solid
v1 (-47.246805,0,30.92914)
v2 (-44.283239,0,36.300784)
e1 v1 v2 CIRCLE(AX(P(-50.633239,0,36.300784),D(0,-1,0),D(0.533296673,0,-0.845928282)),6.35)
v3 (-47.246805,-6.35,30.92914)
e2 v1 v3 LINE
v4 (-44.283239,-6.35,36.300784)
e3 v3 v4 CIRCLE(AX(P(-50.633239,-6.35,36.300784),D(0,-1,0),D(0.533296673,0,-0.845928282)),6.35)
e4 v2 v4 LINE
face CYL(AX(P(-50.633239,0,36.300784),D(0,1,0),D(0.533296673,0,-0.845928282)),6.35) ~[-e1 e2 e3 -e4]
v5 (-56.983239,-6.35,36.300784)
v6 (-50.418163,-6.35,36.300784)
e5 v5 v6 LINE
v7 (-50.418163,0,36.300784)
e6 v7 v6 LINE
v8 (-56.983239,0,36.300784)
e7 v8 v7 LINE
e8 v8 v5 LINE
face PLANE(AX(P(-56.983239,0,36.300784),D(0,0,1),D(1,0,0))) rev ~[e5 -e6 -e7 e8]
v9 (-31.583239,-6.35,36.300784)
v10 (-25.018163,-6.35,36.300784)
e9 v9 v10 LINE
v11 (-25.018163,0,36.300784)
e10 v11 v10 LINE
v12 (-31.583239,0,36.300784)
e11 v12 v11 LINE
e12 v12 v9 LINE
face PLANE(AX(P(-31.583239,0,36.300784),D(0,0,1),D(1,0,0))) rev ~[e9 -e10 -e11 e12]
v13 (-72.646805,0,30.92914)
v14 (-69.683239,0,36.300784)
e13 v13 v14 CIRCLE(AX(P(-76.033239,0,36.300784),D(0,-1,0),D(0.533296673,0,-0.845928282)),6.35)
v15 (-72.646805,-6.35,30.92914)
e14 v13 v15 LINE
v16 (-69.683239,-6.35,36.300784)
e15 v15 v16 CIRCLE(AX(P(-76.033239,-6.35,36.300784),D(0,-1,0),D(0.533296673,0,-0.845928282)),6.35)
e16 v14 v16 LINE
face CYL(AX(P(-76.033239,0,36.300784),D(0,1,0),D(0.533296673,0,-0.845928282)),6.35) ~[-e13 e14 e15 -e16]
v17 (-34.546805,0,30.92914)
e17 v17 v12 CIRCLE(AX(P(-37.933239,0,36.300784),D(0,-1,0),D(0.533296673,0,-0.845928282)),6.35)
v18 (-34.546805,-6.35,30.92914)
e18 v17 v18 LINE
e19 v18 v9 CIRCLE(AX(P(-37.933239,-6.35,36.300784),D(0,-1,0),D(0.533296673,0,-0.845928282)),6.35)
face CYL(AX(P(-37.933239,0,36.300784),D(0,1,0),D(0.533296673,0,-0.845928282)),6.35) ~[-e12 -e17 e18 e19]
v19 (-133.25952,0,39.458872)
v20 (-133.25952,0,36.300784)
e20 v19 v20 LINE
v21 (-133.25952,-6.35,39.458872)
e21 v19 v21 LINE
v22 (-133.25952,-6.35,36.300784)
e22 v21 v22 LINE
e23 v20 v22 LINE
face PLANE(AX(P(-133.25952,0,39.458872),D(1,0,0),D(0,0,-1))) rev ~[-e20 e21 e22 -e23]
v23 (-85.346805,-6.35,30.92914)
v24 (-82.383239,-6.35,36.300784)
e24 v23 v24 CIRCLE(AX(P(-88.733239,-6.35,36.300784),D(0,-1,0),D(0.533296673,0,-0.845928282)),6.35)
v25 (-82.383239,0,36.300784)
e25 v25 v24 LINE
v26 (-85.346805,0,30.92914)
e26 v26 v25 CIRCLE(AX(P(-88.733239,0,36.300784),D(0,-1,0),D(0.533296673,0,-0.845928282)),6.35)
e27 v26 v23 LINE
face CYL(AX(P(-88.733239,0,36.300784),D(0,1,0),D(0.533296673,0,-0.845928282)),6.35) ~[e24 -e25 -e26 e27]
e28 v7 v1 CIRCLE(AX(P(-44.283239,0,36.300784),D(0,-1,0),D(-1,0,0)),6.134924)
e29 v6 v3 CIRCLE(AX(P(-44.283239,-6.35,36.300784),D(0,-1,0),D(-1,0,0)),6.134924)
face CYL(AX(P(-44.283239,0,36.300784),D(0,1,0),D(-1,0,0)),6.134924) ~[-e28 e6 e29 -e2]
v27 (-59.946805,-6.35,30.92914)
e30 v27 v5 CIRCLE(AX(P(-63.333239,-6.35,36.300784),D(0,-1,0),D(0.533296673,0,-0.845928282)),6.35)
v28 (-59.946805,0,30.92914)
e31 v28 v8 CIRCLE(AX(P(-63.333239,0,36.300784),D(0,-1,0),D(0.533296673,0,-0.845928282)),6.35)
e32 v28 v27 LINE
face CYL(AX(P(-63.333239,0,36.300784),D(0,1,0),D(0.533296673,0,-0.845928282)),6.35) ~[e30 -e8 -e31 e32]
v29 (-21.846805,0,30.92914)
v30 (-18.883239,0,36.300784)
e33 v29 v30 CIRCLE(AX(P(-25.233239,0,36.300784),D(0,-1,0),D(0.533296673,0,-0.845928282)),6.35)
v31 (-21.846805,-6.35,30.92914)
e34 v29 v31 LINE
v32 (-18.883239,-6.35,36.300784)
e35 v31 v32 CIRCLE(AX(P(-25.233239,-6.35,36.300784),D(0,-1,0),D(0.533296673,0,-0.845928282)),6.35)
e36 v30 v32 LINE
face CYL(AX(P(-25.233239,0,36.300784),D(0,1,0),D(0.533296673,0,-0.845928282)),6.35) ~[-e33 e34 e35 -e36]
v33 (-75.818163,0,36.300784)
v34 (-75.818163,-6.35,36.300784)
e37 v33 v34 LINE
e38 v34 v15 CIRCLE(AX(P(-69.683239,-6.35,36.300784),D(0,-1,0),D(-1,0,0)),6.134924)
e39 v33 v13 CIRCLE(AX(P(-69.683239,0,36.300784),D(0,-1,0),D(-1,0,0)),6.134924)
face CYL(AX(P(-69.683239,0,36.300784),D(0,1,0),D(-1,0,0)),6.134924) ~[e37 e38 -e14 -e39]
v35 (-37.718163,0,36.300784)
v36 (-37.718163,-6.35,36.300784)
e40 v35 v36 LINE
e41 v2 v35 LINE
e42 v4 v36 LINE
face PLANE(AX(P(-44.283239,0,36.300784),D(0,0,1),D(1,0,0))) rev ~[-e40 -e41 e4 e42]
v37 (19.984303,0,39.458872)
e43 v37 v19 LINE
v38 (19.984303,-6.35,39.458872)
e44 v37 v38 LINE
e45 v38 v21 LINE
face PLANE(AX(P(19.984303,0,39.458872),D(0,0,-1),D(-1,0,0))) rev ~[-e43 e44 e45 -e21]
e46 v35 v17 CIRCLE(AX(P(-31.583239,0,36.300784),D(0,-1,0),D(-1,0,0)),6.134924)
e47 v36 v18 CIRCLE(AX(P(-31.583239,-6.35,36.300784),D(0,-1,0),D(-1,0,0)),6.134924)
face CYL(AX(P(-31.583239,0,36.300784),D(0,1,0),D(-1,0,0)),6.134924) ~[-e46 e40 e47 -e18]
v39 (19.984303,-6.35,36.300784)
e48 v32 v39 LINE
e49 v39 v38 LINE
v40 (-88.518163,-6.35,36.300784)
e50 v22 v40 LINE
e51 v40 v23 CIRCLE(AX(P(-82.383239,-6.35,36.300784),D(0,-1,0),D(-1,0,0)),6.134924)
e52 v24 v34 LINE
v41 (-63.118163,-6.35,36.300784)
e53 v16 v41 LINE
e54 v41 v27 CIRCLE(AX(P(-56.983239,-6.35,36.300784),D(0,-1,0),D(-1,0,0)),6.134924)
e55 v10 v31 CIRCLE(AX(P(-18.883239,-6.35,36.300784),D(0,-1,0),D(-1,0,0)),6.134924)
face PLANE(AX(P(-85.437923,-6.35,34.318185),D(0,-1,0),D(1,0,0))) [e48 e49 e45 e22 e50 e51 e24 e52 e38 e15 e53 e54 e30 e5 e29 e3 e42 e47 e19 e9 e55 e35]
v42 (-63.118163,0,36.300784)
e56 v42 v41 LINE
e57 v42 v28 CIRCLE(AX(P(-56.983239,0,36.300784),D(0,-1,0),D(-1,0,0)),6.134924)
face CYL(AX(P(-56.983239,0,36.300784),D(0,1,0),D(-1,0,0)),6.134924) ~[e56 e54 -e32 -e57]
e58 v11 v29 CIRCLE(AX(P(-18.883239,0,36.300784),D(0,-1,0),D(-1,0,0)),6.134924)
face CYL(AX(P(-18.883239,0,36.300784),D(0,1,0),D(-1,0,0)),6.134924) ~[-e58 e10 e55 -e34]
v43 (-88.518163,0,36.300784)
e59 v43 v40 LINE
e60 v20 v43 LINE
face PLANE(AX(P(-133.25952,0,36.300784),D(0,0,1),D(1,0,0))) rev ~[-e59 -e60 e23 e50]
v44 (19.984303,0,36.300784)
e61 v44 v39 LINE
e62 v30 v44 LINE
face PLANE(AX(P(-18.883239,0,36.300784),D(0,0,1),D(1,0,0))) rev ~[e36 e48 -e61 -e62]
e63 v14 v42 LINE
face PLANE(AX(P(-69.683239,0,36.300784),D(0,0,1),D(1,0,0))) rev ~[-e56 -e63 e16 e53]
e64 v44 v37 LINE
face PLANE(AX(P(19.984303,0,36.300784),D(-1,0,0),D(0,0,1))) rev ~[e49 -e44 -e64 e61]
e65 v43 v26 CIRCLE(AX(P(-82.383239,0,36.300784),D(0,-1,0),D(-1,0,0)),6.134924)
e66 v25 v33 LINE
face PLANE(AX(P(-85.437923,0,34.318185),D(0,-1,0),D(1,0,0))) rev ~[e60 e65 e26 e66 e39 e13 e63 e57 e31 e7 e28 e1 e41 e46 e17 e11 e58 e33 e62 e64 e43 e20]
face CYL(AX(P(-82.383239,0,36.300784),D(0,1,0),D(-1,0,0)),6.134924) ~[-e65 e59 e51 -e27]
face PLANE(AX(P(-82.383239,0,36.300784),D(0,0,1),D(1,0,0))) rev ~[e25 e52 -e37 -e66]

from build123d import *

# Parameters (mm, degrees)
F1_DEPTH = 6.35


# Not quite as in the source:
# - a feature names something its author has since deleted; it is built from what else it names


with BuildPart() as f1:
    # F0 (on Front) → F1 (new body)
    with BuildSketch(Plane.XZ):
        with BuildLine():
            Line((-82.3832392616, 36.3007842489), (-88.5181630436, 36.3007842489))
            ThreePointArc((-88.5181630436, 36.3007842489), (-87.6661618487, 33.1818070528), (-85.3468053884, 30.9291396569))
            ThreePointArc((-85.3468053884, 30.9291396569), (-83.1732772521, 33.2333223579), (-82.3832392616, 36.3007842489))
        make_face()
        with BuildLine():
            Line((-69.6832392616, 36.3007842489), (-75.8181630436, 36.3007842489))
            ThreePointArc((-75.8181630436, 36.3007842489), (-74.9661618487, 33.1818070528), (-72.6468053884, 30.9291396569))
            ThreePointArc((-72.6468053884, 30.9291396569), (-70.4732772521, 33.2333223579), (-69.6832392616, 36.3007842489))
        make_face()
        with BuildLine():
            Line((-56.9832392616, 36.3007842489), (-63.1181630436, 36.3007842489))
            ThreePointArc((-63.1181630436, 36.3007842489), (-62.2661618487, 33.1818070528), (-59.9468053884, 30.9291396569))
            ThreePointArc((-59.9468053884, 30.9291396569), (-57.7732772521, 33.2333223579), (-56.9832392616, 36.3007842489))
        make_face()
        with BuildLine():
            Line((-44.2832392616, 36.3007842489), (-50.4181630436, 36.3007842489))
            ThreePointArc((-50.4181630436, 36.3007842489), (-49.5661618487, 33.1818070528), (-47.2468053884, 30.9291396569))
            ThreePointArc((-47.2468053884, 30.9291396569), (-45.0732772521, 33.2333223579), (-44.2832392616, 36.3007842489))
        make_face()
        with BuildLine():
            Line((-31.5832392616, 36.3007842489), (-37.7181630436, 36.3007842489))
            ThreePointArc((-37.7181630436, 36.3007842489), (-36.8661618487, 33.1818070528), (-34.5468053884, 30.9291396569))
            ThreePointArc((-34.5468053884, 30.9291396569), (-32.3732772521, 33.2333223579), (-31.5832392616, 36.3007842489))
        make_face()
        with BuildLine():
            Line((-18.8832392616, 36.3007842489), (-25.0181630436, 36.3007842489))
            ThreePointArc((-25.0181630436, 36.3007842489), (-24.1661618487, 33.1818070528), (-21.8468053884, 30.9291396569))
            ThreePointArc((-21.8468053884, 30.9291396569), (-19.6732772521, 33.2333223579), (-18.8832392616, 36.3007842489))
        make_face()
        Polygon((-117.1290501952, 36.3007842489), (-100.1673217514, 36.3007842489), (-88.5181630436, 36.3007842489), (-82.3832392616, 36.3007842489), (-75.8181630436, 36.3007842489), (-69.6832392616, 36.3007842489), (-63.1181630436, 36.3007842489), (-56.9832392616, 36.3007842489), (-50.4181630436, 36.3007842489), (-44.2832392616, 36.3007842489), (-37.7181630436, 36.3007842489), (-31.5832392616, 36.3007842489), (-25.0181630436, 36.3007842489), (-18.8832392616, 36.3007842489), (1.4326782486, 36.3007842489), (15.6819988042, 36.3007842489), (19.9843030423, 36.3007842489), (19.9843030423, 39.4588721526), (6.4166695811, 39.4588721526), (1.4326782486, 39.4588721526), (-106.9938540459, 39.4588721526), (-120.9527105093, 39.4588721526), (-133.2595199347, 39.4588721526), (-133.2595199347, 36.3007842489), (-127.7280002832, 36.3007842489), align=None)
    extrude(amount=F1_DEPTH)


solid = f1.part
